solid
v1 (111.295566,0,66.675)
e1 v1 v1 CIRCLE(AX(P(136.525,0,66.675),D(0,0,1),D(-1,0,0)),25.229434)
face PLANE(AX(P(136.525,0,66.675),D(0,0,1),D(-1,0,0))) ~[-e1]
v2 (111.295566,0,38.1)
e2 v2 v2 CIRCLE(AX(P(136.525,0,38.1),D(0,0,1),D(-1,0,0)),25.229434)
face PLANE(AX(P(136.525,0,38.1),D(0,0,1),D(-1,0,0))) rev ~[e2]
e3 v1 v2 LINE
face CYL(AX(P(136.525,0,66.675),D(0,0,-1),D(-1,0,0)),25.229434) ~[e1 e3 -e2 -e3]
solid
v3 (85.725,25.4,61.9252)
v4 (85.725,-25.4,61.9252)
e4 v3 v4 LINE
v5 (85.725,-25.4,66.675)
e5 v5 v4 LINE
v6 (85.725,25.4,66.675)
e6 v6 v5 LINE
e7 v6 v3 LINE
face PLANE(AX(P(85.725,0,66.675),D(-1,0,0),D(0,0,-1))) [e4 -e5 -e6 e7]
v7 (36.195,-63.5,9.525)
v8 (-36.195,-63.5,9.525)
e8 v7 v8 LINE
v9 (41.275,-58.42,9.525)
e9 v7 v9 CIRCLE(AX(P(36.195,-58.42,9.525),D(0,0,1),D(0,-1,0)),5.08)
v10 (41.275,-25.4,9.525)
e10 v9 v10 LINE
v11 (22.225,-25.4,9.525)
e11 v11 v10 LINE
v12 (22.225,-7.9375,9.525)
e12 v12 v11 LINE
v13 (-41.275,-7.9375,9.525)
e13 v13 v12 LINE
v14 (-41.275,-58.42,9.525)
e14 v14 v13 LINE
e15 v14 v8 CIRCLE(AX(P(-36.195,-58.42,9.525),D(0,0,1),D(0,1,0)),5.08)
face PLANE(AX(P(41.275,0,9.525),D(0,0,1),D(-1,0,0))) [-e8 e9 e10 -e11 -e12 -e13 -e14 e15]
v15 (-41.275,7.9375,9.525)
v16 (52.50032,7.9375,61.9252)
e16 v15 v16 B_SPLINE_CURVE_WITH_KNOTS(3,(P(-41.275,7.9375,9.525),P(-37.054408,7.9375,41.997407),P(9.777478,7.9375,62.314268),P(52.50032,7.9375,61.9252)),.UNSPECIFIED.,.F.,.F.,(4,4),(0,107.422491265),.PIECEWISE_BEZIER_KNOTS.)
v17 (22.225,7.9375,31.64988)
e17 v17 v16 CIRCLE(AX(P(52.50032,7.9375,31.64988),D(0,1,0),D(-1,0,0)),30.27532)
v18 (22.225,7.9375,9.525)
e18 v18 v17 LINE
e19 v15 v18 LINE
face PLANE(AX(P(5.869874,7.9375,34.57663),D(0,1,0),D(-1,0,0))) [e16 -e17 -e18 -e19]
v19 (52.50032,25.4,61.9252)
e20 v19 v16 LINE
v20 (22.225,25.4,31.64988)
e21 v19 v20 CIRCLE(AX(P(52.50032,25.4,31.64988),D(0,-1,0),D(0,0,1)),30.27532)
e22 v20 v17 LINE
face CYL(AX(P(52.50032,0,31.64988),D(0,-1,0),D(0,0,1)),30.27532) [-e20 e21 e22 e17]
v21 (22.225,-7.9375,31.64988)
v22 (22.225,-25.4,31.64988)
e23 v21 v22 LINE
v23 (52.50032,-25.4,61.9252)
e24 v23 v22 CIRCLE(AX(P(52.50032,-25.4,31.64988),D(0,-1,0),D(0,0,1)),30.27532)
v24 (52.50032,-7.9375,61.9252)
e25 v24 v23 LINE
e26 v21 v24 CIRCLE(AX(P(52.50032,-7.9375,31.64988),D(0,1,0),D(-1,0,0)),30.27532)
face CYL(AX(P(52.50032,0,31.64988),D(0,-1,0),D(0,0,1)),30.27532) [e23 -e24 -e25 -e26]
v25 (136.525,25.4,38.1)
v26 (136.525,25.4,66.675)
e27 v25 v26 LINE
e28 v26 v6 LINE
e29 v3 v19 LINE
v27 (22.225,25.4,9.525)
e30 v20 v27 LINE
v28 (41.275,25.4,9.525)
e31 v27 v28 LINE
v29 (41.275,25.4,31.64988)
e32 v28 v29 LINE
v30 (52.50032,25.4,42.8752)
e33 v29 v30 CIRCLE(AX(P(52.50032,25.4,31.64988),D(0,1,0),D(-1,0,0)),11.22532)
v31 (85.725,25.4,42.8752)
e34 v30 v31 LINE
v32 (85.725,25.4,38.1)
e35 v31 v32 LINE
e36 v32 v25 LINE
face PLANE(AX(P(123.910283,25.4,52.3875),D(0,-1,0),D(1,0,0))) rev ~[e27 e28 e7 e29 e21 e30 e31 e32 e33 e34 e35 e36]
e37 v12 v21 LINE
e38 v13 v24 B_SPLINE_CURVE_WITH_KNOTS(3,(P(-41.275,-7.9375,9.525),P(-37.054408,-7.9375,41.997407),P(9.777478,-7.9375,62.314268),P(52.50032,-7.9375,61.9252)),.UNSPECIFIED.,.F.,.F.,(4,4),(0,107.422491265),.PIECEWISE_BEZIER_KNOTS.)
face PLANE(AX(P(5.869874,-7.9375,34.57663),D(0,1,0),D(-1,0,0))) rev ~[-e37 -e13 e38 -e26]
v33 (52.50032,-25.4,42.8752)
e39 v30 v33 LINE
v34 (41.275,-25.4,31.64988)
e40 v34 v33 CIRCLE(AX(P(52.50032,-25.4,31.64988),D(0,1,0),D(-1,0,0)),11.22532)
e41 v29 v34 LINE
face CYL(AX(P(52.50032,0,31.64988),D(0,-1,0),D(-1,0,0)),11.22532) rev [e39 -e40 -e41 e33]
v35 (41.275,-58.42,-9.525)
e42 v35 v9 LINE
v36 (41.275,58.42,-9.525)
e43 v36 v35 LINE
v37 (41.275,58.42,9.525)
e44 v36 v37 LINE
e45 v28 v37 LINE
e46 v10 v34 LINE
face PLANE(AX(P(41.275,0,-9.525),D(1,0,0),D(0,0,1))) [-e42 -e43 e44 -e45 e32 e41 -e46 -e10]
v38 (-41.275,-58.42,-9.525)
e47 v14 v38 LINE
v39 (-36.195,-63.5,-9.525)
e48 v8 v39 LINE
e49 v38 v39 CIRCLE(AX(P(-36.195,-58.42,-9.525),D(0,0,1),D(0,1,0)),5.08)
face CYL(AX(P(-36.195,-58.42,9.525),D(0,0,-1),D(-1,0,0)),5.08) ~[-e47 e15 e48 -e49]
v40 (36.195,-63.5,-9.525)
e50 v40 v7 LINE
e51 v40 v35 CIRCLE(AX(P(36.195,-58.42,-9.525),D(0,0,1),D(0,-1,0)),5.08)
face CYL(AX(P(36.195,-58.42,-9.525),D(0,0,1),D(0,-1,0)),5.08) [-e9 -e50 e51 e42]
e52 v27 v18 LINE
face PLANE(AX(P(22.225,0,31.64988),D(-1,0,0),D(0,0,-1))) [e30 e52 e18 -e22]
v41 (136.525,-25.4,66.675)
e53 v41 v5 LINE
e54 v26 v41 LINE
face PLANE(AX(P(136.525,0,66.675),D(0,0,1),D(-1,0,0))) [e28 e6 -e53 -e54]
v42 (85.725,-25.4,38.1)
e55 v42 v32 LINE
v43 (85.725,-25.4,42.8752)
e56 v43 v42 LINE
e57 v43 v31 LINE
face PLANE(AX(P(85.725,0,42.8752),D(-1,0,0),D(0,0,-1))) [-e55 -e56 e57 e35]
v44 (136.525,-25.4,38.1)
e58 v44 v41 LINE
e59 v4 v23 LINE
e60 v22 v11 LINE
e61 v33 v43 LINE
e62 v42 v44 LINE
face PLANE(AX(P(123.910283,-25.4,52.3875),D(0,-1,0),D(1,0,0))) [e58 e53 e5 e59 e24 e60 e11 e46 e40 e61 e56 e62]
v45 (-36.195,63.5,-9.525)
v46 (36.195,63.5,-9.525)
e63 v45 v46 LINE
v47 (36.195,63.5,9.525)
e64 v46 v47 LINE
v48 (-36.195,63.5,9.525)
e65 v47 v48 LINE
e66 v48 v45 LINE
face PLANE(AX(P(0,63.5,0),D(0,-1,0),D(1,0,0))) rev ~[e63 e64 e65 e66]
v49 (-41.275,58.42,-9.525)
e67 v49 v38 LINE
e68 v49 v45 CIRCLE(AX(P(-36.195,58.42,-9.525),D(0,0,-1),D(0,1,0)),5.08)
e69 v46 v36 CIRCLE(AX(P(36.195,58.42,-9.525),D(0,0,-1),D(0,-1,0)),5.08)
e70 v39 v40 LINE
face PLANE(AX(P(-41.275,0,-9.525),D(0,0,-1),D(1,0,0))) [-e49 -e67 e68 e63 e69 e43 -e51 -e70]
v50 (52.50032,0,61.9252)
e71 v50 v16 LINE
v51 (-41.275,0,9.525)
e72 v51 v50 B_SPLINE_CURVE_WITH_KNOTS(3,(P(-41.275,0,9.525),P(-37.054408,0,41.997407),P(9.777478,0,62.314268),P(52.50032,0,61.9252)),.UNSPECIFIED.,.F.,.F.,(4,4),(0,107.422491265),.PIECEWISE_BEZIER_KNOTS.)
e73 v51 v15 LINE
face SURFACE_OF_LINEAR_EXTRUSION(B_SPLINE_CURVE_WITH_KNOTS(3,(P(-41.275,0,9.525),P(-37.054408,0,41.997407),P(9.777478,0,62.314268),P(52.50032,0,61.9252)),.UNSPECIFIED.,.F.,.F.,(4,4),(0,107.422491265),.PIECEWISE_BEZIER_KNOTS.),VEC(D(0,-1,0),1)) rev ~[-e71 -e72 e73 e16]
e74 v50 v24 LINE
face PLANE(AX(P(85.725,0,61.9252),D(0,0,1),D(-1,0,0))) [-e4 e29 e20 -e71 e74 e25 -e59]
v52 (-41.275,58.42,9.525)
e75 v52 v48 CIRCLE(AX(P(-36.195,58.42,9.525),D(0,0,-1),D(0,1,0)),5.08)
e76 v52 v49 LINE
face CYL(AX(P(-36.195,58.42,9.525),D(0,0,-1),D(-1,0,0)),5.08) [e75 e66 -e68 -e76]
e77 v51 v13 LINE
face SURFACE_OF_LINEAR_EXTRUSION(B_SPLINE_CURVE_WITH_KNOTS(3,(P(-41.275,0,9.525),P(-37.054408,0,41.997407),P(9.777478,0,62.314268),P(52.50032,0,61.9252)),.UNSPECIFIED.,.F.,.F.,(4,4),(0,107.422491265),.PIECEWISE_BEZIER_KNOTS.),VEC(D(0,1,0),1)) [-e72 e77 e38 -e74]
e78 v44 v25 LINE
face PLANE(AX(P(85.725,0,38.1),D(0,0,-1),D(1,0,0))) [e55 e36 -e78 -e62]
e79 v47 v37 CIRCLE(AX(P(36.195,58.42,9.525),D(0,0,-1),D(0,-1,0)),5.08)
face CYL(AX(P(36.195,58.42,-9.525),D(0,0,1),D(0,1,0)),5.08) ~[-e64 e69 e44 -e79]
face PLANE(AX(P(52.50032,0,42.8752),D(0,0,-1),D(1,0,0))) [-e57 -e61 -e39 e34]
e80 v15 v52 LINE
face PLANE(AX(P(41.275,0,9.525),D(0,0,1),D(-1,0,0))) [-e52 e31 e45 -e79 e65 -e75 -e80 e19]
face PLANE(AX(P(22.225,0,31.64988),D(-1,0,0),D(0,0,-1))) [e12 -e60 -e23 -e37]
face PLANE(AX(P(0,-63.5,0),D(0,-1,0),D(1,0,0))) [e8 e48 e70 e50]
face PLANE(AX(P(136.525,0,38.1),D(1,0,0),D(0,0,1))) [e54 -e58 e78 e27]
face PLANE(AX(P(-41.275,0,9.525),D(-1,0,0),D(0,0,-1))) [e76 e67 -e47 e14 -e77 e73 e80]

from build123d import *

# Parameters (mm, degrees)
F1_DEPTH = 63.5
F0_W     = 25.5705659628
F0_H     = 4.7498
F0_H_2   = 19.05
F0_H_3   = 4.7752
F2_DEPTH = 25.4
F3_DEPTH = 7.9375
F5_R     = 5.08


with BuildPart() as f1:
    # F0 (on Front) → F1 (new body, symmetric)
    with BuildSketch(Plane.XZ):
        Polygon((22.225, 9.525), (-41.275, 9.525), (-41.275, -9.525), (41.275, -9.525), (41.275, 9.525), align=None)
    extrude(amount=F1_DEPTH, both=True)

    # F0 (on Front) → F2 (join, symmetric)
    with BuildSketch(Plane.XZ):
        Polygon((111.2955659628, 66.675), (111.2955659628, 61.9252), (111.2955659628, 42.8752), (111.2955659628, 38.1), (136.525, 38.1), (136.525, 66.675), align=None)
        with Locations((98.5102829814, 64.3001)):
            Rectangle(F0_W, F0_H)
        with Locations((98.5102829814, 52.4002)):
            Rectangle(F0_W, F0_H_2)
        with Locations((98.5102829814, 40.4876)):
            Rectangle(F0_W, F0_H_3)
        with BuildLine():
            Line((22.225, 31.6498798487), (22.225, 9.525))
            Line((22.225, 9.525), (41.275, 9.525))
            Line((41.275, 9.525), (41.275, 31.6498798487))
            ThreePointArc((41.275, 31.6498798487), (44.5628201513, 39.5873798487), (52.5003201513, 42.8752))
            Line((52.5003201513, 42.8752), (85.725, 42.8752))
            Line((85.725, 42.8752), (85.725, 61.9252))
            Line((85.725, 61.9252), (52.5003201513, 61.9252))
            ThreePointArc((52.5003201513, 61.9252), (31.0924359697, 53.0577640303), (22.225, 31.6498798487))
        make_face()
    extrude(amount=F2_DEPTH, both=True)

    # F0 (on Front) → F3 (join, symmetric)
    with BuildSketch(Plane.XZ):
        with BuildLine():
            add(Edge.make_bspline(
                [(-41.275, 9.525), (-37.0544083416, 41.9974066317), (9.7774779424, 62.3142682016), (52.5003201513, 61.9252)],
                knots=[0, 0, 0, 0, 107.4224912648, 107.4224912648, 107.4224912648, 107.4224912648], degree=3))
            Line((-41.275, 9.525), (22.225, 9.525))
            Line((22.225, 9.525), (22.225, 31.6498798487))
            ThreePointArc((22.225, 31.6498798487), (31.0924359697, 53.0577640303), (52.5003201513, 61.9252))
        make_face()
    extrude(amount=F3_DEPTH, both=True)

    # F5
    f5_edges = [f1.edges().sort_by_distance(p)[0] for p in [
        (41.275, -63.5, 0),
        (-41.275, -63.5, 0),
        (-41.275, 63.5, 0),
        (41.275, 63.5, 0),
    ]]
    fillet(f5_edges, radius=F5_R)


with BuildPart() as f4:
    # F0 (on Front) → F4 (revolve)
    with BuildSketch(Plane.XZ):
        Polygon((111.2955659628, 66.675), (111.2955659628, 61.9252), (111.2955659628, 42.8752), (111.2955659628, 38.1), (136.525, 38.1), (136.525, 66.675), align=None)
    revolve(axis=Axis((136.525, 0, 52.3875), (0, 0, 1)))


solid = Compound([f1.part, f4.part])
